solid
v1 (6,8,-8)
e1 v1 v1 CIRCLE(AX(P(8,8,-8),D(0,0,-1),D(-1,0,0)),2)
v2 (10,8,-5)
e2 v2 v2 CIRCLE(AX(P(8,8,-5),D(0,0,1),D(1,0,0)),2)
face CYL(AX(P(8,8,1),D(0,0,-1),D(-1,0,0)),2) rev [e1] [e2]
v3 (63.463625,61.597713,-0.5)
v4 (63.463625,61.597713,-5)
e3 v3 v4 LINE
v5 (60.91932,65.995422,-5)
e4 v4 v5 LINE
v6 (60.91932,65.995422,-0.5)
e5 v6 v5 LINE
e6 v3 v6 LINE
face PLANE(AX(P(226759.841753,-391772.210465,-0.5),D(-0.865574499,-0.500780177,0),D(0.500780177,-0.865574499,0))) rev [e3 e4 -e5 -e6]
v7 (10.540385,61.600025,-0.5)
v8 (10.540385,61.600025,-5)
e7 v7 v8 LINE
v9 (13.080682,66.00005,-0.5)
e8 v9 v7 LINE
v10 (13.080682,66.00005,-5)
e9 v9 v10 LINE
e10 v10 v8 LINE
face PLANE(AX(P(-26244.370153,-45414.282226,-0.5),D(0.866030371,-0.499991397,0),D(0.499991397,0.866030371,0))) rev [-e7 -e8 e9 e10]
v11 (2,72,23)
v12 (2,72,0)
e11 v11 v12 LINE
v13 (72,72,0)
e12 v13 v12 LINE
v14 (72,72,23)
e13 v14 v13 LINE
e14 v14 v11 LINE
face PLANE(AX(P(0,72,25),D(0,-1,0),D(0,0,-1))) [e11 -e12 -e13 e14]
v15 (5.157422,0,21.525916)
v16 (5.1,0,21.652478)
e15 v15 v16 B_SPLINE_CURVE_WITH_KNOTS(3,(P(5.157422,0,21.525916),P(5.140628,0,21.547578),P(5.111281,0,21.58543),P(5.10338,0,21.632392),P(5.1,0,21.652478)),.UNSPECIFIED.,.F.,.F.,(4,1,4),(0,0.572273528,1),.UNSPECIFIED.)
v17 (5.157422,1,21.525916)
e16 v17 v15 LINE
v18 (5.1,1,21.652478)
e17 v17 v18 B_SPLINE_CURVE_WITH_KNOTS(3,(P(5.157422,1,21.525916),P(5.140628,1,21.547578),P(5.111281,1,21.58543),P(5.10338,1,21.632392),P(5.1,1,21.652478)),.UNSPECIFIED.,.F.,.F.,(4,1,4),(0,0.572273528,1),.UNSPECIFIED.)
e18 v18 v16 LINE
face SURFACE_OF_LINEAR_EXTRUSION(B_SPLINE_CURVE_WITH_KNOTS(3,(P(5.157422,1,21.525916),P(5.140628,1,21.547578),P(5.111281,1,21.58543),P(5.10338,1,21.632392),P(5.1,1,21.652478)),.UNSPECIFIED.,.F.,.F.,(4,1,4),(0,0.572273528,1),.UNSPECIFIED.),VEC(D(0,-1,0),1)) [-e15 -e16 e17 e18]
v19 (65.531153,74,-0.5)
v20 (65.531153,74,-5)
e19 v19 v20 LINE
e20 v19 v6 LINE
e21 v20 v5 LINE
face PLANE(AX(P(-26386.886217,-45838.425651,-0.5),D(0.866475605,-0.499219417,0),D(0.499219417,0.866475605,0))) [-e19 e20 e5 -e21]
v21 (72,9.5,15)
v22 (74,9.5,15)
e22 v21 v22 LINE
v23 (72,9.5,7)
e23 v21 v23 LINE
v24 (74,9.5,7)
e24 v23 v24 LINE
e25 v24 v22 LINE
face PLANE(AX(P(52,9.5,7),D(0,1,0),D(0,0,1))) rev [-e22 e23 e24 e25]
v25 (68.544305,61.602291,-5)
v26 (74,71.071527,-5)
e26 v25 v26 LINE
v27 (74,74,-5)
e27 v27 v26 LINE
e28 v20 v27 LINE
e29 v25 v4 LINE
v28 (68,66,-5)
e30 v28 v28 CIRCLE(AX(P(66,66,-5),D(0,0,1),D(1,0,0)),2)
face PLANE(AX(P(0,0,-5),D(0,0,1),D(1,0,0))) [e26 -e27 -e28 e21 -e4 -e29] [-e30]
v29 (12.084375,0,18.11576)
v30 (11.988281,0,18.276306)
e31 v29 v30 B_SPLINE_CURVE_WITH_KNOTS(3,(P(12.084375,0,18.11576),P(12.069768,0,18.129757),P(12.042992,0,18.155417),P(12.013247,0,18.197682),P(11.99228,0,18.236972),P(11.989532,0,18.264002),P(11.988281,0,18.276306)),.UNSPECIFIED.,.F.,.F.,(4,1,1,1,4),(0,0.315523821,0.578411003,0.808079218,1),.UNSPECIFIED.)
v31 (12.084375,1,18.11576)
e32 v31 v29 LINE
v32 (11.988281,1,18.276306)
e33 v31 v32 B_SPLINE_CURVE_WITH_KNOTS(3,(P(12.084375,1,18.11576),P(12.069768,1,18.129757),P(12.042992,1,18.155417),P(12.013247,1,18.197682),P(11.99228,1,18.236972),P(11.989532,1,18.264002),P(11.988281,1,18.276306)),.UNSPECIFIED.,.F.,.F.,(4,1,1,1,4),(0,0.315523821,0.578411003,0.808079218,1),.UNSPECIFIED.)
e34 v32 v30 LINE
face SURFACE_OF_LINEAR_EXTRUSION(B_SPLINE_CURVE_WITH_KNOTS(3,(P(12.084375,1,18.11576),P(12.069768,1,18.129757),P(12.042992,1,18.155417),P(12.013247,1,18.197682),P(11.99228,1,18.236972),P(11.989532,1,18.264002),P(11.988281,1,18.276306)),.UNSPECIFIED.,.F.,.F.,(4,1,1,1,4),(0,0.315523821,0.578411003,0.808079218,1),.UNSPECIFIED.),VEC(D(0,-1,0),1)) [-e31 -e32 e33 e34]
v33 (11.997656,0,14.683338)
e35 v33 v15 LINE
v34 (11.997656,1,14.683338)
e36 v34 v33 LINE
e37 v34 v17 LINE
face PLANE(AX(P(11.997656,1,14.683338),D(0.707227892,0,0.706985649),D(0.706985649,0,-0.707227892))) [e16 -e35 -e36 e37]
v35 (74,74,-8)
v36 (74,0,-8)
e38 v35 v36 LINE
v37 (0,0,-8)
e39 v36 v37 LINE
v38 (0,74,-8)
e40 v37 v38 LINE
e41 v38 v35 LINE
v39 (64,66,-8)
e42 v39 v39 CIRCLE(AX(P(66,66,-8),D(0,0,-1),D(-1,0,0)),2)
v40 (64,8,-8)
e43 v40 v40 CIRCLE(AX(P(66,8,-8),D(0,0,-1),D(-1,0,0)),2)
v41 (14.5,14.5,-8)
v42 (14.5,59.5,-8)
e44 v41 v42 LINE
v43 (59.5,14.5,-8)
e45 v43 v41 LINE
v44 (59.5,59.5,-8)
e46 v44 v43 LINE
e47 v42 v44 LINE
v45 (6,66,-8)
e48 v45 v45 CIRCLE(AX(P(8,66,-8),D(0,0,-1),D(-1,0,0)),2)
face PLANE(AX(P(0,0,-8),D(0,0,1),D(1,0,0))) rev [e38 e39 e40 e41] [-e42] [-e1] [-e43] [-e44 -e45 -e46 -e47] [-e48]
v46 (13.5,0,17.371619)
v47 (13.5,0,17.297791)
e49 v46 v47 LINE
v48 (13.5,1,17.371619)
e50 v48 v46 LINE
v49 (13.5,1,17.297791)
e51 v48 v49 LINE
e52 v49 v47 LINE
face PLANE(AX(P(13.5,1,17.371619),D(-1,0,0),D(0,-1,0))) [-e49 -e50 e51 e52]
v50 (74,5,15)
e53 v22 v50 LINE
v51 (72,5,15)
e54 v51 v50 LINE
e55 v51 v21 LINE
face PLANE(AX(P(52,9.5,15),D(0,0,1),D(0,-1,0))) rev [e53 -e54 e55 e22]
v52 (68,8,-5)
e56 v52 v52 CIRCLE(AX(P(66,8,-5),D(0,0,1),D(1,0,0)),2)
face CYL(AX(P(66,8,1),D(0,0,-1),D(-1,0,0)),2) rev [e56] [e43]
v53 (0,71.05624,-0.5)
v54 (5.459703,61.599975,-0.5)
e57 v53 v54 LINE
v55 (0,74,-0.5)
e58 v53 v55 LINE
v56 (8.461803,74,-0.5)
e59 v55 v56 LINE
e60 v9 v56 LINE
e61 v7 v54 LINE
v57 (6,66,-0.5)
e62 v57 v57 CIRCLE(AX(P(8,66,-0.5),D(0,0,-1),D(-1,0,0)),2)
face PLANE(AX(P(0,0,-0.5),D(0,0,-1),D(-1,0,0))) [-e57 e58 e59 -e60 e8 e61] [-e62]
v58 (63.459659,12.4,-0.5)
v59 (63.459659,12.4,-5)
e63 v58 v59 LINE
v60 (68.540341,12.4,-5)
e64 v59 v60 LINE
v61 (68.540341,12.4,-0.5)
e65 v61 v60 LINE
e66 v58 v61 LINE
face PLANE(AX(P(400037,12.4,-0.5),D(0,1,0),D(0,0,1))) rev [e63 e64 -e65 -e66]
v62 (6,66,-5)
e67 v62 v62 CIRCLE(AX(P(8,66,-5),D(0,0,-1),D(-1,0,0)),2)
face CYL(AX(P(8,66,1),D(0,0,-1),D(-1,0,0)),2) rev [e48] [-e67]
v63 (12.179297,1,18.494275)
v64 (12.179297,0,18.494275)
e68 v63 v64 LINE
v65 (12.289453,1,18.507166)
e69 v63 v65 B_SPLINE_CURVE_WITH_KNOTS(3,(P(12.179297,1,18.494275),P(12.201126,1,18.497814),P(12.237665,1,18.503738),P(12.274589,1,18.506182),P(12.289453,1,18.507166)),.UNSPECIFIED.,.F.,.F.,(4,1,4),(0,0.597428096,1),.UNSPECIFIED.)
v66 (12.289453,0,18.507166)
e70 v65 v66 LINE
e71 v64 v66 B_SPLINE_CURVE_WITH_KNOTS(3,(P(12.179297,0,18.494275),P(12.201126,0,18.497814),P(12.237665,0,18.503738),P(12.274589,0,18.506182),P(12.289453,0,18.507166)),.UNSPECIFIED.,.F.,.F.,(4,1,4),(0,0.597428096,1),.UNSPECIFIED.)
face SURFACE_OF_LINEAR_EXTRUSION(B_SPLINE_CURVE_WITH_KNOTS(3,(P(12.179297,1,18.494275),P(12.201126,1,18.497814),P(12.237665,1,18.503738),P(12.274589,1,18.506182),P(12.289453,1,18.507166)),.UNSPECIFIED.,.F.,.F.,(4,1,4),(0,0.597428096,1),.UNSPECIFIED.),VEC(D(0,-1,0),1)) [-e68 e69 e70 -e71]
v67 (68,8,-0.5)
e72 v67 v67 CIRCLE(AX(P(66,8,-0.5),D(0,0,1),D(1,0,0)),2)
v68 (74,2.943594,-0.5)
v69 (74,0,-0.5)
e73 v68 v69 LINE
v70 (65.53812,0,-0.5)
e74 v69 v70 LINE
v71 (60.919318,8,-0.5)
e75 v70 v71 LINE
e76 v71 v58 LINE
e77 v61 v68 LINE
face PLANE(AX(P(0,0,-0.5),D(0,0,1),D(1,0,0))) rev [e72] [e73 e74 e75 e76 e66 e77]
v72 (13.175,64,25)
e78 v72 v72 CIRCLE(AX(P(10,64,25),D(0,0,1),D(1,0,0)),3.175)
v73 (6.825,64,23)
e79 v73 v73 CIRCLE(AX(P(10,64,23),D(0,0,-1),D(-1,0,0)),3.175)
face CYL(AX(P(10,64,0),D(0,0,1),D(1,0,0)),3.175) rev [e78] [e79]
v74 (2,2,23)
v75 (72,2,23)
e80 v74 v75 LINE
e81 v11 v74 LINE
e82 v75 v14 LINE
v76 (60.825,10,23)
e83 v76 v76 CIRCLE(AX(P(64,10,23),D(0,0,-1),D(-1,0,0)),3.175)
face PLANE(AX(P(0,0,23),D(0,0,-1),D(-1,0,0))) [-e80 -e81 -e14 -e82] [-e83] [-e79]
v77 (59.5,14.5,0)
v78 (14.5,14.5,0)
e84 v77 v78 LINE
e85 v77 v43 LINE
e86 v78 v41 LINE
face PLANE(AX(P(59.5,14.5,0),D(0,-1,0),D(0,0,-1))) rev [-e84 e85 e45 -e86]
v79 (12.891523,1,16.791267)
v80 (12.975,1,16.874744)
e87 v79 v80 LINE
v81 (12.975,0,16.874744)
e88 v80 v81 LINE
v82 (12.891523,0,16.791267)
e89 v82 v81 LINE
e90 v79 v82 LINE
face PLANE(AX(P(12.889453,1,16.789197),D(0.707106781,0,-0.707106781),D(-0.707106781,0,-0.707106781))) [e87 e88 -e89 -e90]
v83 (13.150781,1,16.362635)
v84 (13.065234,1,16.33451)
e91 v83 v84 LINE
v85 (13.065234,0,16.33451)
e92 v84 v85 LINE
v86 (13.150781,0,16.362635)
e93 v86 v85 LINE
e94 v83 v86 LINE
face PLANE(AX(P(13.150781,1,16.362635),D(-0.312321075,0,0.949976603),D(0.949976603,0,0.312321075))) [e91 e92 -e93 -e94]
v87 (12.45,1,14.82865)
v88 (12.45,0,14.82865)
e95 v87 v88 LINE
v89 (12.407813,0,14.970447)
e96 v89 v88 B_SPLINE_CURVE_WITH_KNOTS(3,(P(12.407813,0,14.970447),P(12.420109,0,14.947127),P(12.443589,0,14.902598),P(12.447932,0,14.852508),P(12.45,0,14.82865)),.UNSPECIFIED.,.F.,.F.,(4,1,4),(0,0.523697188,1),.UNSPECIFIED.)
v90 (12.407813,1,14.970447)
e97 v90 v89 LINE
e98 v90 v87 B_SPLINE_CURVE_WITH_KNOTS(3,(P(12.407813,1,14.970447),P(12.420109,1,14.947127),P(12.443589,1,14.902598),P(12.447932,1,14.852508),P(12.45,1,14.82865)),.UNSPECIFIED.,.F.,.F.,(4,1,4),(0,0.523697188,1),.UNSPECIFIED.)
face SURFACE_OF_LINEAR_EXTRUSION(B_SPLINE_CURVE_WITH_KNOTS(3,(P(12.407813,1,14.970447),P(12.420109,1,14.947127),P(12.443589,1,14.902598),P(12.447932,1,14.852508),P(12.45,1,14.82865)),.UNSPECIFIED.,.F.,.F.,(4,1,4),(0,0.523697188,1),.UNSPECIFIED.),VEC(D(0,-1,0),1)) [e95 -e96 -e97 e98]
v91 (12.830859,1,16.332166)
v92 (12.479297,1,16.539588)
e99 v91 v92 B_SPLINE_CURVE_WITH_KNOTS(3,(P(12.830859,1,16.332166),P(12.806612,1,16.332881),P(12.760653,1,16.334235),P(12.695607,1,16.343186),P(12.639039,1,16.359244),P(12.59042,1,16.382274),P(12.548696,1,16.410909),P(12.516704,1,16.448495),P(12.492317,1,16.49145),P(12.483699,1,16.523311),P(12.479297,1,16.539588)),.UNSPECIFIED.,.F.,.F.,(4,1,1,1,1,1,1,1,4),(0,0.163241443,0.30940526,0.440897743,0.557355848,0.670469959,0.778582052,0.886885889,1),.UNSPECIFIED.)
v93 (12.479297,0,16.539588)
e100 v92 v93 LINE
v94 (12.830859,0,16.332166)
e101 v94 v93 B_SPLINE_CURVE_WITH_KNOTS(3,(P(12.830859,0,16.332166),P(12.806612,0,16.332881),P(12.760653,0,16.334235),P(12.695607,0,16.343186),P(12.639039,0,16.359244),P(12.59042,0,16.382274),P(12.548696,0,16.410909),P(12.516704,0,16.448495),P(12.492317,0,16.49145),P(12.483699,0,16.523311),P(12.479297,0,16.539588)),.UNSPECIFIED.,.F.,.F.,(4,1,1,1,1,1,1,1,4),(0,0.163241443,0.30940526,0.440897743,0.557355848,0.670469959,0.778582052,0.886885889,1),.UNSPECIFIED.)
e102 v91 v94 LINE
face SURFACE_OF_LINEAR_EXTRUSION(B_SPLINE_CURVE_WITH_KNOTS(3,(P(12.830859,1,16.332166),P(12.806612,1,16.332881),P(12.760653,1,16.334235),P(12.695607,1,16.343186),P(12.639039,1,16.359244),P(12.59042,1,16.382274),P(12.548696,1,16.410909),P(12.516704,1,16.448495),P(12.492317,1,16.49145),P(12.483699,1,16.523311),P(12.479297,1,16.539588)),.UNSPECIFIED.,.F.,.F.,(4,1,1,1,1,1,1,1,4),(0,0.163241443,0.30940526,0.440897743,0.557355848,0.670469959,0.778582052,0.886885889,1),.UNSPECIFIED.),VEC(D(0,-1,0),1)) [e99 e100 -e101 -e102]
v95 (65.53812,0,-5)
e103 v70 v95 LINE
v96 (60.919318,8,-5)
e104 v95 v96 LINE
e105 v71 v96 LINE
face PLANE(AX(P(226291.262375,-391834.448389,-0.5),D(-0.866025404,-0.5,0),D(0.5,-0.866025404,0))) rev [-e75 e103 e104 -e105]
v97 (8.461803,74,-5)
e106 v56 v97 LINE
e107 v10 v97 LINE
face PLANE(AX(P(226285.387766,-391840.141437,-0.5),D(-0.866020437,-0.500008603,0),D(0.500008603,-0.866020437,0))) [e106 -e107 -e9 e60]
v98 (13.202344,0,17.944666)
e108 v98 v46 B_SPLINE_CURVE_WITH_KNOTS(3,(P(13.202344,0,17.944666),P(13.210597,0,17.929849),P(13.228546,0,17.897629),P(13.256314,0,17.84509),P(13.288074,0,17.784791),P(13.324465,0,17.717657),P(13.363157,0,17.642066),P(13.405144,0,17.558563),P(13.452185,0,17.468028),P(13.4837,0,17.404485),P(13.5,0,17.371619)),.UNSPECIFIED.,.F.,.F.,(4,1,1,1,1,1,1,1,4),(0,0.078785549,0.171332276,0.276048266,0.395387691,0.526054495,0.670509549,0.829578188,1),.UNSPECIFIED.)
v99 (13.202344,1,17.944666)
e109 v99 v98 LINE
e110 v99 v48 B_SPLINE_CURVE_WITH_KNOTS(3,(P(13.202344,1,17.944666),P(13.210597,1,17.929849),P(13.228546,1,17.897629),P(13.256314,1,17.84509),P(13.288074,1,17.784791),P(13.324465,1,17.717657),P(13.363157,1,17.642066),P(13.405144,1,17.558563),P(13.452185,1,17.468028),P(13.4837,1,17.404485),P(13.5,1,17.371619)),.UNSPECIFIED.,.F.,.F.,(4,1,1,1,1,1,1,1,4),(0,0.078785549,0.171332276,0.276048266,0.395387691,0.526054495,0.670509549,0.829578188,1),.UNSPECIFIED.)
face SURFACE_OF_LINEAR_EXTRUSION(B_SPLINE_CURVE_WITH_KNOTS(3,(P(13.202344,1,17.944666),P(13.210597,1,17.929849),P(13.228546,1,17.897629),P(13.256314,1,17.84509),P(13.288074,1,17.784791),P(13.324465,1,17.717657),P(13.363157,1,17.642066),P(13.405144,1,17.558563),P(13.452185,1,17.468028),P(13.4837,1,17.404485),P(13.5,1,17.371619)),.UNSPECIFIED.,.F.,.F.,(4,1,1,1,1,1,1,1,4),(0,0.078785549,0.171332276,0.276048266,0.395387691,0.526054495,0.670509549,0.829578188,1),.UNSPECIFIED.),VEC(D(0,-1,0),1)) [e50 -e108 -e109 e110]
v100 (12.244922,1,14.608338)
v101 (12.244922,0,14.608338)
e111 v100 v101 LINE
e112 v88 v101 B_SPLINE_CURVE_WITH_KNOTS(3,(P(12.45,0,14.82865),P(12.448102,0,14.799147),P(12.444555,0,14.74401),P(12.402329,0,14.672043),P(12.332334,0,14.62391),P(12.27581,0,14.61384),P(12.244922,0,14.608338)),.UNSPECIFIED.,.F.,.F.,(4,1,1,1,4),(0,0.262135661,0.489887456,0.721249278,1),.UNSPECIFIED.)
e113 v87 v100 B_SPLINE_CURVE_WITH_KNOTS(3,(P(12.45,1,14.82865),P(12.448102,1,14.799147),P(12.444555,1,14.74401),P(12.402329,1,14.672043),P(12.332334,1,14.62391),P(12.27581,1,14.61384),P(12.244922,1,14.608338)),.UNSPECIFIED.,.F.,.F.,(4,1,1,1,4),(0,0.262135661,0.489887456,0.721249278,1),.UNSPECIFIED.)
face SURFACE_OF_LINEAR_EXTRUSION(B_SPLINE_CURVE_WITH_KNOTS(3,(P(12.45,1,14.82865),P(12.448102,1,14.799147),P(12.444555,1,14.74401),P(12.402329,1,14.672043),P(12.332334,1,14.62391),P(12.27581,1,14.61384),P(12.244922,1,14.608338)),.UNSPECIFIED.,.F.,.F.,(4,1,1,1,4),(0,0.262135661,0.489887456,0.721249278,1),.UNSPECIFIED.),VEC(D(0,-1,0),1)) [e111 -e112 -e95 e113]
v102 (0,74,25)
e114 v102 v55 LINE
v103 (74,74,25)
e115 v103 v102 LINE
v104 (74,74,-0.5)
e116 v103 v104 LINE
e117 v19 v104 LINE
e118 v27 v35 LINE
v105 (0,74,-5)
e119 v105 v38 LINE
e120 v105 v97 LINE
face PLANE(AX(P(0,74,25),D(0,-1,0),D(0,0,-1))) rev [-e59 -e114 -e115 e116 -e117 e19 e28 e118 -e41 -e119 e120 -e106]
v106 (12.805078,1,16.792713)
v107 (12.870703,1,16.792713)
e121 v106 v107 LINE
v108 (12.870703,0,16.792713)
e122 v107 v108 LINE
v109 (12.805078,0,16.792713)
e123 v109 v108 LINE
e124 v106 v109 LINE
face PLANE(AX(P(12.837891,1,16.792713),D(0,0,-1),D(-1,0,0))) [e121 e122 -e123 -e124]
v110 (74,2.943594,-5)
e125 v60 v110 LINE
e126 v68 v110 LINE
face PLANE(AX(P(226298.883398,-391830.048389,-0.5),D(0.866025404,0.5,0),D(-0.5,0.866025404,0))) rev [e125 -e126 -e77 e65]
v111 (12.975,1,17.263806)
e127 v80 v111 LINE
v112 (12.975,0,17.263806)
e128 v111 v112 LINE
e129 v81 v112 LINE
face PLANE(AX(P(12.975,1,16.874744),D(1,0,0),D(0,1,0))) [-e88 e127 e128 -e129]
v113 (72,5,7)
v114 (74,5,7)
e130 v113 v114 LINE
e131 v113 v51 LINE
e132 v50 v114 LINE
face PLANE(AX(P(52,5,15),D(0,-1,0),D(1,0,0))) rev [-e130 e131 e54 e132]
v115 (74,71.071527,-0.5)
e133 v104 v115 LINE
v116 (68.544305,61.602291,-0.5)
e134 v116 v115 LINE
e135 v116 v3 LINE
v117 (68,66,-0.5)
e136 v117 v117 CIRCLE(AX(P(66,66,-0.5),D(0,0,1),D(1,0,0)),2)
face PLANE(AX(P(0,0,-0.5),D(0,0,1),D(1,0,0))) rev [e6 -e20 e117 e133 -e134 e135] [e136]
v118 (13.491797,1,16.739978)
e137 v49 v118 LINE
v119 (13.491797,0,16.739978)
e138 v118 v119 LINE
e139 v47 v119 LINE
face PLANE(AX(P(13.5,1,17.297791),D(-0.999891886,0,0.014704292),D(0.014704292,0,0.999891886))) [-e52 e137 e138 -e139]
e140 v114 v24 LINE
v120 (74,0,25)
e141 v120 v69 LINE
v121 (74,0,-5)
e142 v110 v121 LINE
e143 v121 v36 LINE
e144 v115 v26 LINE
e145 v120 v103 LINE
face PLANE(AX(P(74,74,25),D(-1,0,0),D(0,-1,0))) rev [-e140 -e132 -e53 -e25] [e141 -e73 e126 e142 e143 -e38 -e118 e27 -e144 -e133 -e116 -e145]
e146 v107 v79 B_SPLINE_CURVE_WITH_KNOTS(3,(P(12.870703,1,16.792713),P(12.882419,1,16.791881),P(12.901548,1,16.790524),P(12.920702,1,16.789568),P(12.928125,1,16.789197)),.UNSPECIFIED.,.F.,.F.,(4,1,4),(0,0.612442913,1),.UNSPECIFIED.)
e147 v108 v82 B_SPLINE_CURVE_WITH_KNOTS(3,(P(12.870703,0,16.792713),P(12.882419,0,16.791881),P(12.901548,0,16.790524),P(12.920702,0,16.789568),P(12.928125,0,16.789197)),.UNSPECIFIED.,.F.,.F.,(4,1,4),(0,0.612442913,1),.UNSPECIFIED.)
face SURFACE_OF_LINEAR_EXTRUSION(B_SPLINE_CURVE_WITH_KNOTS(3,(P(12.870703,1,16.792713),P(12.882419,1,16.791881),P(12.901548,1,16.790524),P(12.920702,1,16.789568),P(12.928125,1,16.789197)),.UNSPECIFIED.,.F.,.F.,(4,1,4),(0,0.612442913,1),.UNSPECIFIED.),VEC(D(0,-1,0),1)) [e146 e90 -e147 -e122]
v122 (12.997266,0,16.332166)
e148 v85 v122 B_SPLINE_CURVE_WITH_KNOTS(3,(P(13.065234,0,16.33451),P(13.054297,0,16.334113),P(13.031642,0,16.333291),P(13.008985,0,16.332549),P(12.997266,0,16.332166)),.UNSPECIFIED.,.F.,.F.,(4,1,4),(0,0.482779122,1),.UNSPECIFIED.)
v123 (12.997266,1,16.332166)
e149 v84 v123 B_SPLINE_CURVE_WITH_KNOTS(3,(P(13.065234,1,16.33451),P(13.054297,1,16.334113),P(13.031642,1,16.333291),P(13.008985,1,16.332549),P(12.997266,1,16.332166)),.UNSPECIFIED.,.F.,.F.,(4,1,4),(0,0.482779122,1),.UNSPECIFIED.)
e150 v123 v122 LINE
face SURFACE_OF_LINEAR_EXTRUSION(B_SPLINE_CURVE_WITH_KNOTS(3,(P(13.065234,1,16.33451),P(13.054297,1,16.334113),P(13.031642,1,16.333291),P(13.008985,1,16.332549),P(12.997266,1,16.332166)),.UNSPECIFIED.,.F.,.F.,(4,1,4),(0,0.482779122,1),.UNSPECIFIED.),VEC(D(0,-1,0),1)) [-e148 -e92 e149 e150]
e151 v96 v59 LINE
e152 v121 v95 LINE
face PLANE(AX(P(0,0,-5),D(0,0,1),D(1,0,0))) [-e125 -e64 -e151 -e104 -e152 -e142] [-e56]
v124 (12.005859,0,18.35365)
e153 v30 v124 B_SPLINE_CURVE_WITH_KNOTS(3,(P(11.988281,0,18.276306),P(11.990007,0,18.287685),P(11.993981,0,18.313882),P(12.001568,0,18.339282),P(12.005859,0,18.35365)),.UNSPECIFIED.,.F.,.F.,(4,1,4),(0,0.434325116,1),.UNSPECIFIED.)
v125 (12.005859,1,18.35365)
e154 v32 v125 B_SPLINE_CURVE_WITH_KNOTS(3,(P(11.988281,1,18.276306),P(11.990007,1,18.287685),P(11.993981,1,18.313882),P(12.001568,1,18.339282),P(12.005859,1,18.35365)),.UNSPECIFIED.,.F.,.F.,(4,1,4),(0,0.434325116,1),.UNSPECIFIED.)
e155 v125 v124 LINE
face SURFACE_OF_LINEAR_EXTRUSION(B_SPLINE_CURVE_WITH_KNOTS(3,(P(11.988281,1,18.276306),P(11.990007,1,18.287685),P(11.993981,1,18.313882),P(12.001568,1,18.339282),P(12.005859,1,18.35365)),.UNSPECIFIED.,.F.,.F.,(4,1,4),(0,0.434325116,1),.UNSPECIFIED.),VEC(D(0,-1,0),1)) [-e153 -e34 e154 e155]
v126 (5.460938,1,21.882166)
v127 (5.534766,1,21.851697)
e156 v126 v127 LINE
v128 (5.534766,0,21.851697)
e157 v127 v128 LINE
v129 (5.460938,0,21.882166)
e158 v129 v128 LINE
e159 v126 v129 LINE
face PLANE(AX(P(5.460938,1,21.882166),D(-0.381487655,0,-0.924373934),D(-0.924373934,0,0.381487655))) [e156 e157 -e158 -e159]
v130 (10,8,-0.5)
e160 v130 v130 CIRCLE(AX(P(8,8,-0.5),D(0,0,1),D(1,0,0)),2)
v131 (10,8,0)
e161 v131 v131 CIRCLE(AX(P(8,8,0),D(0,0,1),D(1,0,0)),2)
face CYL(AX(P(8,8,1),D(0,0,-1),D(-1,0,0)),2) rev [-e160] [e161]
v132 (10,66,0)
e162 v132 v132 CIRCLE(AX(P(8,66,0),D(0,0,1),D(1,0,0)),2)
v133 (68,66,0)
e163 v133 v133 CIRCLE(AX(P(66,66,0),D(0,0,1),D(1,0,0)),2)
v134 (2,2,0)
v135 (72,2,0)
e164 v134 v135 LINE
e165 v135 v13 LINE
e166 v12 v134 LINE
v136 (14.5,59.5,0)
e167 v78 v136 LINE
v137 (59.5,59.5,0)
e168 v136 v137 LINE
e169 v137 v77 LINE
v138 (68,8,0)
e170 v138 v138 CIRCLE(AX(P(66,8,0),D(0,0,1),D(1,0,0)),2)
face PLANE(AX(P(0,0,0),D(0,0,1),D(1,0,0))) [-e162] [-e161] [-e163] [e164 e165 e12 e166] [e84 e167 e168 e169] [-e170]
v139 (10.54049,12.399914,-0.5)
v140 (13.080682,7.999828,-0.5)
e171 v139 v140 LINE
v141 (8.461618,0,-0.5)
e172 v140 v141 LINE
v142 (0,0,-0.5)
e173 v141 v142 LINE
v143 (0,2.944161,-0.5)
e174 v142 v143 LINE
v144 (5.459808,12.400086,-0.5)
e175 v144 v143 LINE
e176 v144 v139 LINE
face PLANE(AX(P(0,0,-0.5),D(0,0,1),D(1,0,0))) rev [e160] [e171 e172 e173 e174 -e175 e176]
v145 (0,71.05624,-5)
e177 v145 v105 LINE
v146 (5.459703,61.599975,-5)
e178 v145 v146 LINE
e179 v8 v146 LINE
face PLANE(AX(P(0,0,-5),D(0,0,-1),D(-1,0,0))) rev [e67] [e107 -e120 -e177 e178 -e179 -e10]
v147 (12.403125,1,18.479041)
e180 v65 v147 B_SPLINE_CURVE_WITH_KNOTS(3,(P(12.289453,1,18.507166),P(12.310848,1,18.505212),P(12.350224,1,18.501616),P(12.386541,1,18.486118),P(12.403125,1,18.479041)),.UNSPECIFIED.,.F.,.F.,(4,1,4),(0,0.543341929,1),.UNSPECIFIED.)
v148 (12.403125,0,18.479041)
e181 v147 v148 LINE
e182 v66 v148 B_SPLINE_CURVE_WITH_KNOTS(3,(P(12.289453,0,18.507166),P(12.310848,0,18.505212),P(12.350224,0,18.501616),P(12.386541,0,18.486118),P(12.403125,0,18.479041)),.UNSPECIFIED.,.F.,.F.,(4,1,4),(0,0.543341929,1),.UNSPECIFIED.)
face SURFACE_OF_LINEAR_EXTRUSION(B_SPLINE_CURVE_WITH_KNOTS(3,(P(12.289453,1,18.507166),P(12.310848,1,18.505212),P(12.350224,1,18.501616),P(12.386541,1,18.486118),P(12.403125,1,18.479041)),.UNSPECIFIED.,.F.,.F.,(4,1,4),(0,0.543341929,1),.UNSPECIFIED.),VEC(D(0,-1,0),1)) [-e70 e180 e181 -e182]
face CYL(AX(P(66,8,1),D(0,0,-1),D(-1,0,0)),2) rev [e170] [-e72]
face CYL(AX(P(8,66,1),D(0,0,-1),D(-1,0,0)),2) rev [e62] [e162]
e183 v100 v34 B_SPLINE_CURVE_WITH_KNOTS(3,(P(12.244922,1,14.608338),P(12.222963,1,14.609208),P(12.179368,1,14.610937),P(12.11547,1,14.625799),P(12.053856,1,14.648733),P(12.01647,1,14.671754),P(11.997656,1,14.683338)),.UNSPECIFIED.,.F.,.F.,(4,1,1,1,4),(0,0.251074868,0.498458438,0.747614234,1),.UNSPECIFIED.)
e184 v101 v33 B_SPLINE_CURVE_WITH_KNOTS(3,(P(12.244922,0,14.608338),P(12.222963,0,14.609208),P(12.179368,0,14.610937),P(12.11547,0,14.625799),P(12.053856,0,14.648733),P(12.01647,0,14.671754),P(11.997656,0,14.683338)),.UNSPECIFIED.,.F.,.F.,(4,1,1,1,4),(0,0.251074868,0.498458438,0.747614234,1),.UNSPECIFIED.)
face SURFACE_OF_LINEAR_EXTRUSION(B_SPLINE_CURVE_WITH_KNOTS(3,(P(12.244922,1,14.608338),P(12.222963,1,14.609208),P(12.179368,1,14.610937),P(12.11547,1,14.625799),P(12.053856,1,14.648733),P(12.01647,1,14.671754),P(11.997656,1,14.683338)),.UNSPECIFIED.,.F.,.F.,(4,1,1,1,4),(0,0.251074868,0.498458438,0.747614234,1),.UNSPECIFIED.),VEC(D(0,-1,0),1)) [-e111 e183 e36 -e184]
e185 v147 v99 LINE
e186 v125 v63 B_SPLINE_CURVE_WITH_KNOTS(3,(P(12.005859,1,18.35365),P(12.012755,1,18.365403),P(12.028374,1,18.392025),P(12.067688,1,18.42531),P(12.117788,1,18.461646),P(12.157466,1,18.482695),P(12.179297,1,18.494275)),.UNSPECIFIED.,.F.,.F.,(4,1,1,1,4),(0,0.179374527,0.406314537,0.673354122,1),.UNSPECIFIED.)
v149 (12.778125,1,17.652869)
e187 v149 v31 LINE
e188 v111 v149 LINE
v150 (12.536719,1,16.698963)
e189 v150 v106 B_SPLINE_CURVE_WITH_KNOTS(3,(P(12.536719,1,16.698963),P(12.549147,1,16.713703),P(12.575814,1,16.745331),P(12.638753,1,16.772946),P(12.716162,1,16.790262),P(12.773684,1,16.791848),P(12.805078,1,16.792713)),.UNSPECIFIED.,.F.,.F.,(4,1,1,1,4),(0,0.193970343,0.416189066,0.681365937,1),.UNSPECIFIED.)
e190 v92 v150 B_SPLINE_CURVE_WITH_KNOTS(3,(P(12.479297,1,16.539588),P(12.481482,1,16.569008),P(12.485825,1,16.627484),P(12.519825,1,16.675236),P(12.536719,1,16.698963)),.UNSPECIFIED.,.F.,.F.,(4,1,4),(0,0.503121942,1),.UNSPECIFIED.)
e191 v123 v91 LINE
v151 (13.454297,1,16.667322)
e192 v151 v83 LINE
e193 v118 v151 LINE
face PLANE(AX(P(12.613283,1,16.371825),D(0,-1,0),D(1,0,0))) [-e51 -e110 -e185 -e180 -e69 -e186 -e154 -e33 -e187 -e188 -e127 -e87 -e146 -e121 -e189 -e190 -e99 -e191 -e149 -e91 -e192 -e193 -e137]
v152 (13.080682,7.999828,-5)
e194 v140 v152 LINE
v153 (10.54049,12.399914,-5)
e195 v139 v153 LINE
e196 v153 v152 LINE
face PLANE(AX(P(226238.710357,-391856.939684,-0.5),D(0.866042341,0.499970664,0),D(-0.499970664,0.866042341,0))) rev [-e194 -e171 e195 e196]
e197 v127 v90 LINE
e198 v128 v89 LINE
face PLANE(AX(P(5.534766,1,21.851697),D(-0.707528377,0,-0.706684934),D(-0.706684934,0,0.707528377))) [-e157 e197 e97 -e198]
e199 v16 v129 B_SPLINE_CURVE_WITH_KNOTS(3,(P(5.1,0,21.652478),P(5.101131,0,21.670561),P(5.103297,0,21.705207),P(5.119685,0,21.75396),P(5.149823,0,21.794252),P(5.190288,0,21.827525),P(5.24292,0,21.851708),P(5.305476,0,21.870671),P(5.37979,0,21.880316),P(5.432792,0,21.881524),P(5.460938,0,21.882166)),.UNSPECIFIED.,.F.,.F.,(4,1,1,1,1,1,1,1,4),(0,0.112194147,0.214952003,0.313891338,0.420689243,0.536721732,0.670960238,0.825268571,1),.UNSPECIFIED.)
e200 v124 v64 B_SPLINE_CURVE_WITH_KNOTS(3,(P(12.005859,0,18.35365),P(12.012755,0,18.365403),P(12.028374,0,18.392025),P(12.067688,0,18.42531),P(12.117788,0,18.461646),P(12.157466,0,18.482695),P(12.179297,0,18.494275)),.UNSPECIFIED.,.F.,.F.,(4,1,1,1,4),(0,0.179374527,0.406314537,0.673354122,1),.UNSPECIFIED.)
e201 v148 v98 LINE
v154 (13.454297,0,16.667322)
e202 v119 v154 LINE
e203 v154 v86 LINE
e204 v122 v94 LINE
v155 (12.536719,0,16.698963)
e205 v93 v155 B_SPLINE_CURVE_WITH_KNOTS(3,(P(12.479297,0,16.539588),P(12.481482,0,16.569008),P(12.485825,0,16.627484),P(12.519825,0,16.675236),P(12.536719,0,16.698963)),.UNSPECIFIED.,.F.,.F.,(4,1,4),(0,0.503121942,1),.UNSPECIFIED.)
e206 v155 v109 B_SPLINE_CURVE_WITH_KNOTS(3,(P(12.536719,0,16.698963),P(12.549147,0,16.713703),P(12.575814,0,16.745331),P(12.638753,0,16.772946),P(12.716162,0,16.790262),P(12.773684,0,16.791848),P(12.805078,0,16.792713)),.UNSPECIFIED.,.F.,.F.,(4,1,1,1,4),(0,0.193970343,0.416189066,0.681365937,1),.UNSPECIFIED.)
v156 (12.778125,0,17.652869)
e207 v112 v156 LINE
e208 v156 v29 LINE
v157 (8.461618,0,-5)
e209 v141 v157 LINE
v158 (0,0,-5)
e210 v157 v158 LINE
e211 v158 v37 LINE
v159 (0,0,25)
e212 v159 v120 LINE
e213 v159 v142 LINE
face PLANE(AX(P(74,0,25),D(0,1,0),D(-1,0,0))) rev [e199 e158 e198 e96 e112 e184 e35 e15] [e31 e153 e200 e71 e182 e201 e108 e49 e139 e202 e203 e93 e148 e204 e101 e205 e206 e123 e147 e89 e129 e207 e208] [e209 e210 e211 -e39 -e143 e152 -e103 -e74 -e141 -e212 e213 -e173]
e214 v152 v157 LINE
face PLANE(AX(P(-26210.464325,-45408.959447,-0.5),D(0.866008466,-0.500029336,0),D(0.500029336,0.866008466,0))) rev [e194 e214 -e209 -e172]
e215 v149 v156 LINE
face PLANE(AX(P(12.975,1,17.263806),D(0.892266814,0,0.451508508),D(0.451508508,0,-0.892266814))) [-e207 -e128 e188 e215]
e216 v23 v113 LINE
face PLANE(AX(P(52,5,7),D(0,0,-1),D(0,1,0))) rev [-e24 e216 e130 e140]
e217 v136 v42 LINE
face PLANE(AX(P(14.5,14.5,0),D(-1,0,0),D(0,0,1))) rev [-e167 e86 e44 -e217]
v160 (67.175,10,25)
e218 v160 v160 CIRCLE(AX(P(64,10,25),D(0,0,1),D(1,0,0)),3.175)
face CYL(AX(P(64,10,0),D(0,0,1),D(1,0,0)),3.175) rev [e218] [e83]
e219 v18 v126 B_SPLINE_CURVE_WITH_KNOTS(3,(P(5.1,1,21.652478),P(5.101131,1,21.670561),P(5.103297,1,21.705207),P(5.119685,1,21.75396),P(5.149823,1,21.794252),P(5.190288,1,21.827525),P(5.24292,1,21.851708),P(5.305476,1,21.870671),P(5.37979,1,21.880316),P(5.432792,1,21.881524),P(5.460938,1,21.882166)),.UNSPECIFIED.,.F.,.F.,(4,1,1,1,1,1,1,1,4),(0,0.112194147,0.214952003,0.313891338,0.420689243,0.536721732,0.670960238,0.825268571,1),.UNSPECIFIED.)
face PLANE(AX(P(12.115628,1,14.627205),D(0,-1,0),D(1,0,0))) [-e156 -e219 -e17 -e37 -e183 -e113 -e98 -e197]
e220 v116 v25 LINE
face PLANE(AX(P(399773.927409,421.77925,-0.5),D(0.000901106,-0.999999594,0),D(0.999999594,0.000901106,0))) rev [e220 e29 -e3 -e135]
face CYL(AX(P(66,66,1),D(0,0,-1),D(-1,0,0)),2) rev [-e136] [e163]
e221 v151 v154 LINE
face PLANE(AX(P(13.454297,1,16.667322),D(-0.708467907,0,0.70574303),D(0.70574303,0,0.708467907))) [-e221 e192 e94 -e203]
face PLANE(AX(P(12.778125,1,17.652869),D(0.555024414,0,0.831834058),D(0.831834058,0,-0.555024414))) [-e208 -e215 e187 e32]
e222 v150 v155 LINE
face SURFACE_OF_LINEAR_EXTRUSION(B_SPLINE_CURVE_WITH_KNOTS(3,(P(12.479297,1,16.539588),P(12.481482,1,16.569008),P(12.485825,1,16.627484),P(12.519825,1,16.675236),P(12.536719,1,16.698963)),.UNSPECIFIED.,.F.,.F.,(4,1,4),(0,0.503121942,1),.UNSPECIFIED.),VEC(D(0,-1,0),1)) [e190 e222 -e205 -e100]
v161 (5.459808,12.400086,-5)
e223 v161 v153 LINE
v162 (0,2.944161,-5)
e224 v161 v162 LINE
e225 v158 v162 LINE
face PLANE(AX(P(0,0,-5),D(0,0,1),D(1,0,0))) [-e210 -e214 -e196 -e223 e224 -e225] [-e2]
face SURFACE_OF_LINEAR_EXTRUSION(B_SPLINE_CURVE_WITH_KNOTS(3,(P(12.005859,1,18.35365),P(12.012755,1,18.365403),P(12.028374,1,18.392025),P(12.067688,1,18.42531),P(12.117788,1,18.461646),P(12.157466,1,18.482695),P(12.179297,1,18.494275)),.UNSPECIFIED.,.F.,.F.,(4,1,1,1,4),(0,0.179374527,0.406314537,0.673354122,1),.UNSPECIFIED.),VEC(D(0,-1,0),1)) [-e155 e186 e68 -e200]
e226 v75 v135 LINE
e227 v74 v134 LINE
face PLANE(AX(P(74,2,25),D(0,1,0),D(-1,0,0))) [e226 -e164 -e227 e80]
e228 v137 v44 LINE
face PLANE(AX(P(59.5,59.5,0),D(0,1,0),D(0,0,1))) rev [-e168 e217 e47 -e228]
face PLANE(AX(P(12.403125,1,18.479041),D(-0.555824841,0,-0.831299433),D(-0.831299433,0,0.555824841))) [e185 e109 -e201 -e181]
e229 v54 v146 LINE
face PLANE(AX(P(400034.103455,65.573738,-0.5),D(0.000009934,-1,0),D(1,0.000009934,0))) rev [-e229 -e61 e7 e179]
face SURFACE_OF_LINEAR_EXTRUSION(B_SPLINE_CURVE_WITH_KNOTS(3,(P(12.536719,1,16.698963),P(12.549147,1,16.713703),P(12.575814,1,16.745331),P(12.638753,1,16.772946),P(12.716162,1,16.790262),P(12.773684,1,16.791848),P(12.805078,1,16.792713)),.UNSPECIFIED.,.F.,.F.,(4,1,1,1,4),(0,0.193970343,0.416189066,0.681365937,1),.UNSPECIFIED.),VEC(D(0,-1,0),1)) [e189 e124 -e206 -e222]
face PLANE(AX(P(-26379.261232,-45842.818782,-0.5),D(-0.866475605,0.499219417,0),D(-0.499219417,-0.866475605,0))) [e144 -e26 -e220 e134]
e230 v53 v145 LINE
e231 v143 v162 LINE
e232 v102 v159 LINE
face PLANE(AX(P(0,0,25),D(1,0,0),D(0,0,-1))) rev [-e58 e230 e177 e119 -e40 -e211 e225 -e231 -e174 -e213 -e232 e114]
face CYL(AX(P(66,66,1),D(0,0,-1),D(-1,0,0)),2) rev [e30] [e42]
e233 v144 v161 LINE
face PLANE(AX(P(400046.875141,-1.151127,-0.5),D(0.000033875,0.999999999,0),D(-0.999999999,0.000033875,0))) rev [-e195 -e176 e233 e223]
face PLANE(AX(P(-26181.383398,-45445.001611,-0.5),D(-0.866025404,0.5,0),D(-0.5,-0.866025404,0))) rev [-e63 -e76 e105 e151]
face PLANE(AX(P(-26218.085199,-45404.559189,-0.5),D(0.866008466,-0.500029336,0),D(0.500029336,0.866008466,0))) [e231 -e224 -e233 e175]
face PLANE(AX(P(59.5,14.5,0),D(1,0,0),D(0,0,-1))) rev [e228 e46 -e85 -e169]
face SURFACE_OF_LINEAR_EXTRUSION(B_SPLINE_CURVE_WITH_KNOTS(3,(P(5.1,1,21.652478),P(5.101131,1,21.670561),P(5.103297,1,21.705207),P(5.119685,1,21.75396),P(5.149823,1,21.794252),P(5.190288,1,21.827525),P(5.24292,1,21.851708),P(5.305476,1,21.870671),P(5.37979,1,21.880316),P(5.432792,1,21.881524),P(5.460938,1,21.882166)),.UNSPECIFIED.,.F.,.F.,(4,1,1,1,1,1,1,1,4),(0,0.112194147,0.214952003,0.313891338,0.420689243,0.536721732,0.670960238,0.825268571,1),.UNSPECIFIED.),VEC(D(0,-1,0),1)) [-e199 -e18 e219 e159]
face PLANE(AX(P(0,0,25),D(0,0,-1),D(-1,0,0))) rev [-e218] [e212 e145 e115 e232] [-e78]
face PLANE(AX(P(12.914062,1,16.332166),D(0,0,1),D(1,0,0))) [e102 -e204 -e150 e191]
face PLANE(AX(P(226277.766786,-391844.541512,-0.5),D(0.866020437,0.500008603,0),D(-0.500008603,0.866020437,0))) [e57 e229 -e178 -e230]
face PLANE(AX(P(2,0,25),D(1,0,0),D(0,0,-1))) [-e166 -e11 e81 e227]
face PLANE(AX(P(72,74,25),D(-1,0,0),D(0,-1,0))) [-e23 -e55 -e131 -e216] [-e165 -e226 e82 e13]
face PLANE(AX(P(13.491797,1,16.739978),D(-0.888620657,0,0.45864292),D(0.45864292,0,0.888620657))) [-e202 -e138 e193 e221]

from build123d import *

# Parameters (mm, degrees)
SKETCH1_W           = 74
SKETCH1_H           = 74
BOSS_EXTRUDE1_DEPTH = 25
SHELL1_T            = -2
SKETCH2_W           = 8
SKETCH2_H           = 4.5
CUT_EXTRUDE1_DEPTH  = 22
SKETCH3_R           = 3.175
CUT_EXTRUDE2_DEPTH  = 108.596468344
SKETCH4_W           = 74
SKETCH4_H           = 74
BOSS_EXTRUDE2_DEPTH = 8
CUT_EXTRUDE3_START  = -3
CUT_EXTRUDE3_DEPTH  = 4.5
SKETCH6_W           = 45
SKETCH6_H           = 45
CUT_EXTRUDE4_DEPTH  = 8
CUT_EXTRUDE10_START = -1
CUT_EXTRUDE10_DEPTH = 1
SKETCH5_4_R         = 2
CUT_EXTRUDE11_DEPTH = 9


# Read off the part's stored shape, not the designer's step: Cut-Extrude10
with BuildPart() as part:
    # Sketch1 → Boss-Extrude1 (new body)
    with BuildSketch(Plane.XY):
        with Locations((37, 37)):
            Rectangle(SKETCH1_W, SKETCH1_H)
    extrude(amount=BOSS_EXTRUDE1_DEPTH)

    # Shell1
    shell1_openings = [part.faces().sort_by_distance(p)[0] for p in [
        (37, 37, 0),
    ]]
    offset(amount=SHELL1_T, openings=shell1_openings, kind=Kind.INTERSECTION)

    # Sketch2 → Cut-Extrude1 (cut)
    with BuildSketch(Plane(origin=(74, 0, 0), x_dir=(0, 0, -1), z_dir=(1, 0, 0))):
        with Locations((-11, 7.25)):
            Rectangle(SKETCH2_W, SKETCH2_H)
    extrude(amount=-CUT_EXTRUDE1_DEPTH, mode=Mode.SUBTRACT)

    # Sketch3 → Cut-Extrude2 (cut, through all)
    with BuildSketch(Plane.XY.offset(25)):
        with Locations((10, 64)):
            Circle(SKETCH3_R)
        with Locations((64, 10)):
            Circle(SKETCH3_R)
    extrude(amount=-CUT_EXTRUDE2_DEPTH, mode=Mode.SUBTRACT)

    # Sketch4 → Boss-Extrude2 (add)
    with BuildSketch(Plane(origin=(0, 0, 0), x_dir=(-1, 0, 0), z_dir=(0, 0, -1))):
        with Locations((-37, 37)):
            Rectangle(SKETCH4_W, SKETCH4_H)
    extrude(amount=BOSS_EXTRUDE2_DEPTH)

    # Sketch5 → Cut-Extrude3 (cut)
    with BuildSketch(Plane(origin=(0, 0, -8), x_dir=(-1, 0, 0), z_dir=(0, 0, -1)).offset(CUT_EXTRUDE3_START)):
        Polygon((-60.919317631, 8), (-63.459658816, 12.4), (-68.540341184, 12.4), (-74.568746864, 1.958495074), (-74.568746864, -0.972282173), (-66.099467159, -0.972282173), align=None)
        Polygon((-63.463624712, 61.59771267), (-60.919319694, 65.995421768), (-65.802792889, 74.471475085), (-74.465371111, 74.471475085), (-74.465371111, 71.879253606), (-68.544305018, 61.602290902), align=None)
        Polygon((-5.459702524, 61.599974765), (0.703595557, 72.274875291), (0.703595557, 74.471475085), (-8.189590882, 74.471475085), (-13.080682369, 66.00005047), (-10.540384893, 61.600025235), align=None)
        Polygon((-10.540490231, 12.399913945), (-13.080682366, 7.999827894), (-7.995582963, -0.807133653), (0.571776258, -0.807133653), (0.571776258, 1.953893119), (-5.459807865, 12.40008605), align=None)
    extrude(amount=-CUT_EXTRUDE3_DEPTH, mode=Mode.SUBTRACT)

    # Sketch6 → Cut-Extrude4 (cut)
    with BuildSketch(Plane(origin=(0, 0, -8), x_dir=(-1, 0, 0), z_dir=(0, 0, -1))):
        with Locations((-37, 37)):
            Rectangle(SKETCH6_W, SKETCH6_H)
    extrude(amount=-CUT_EXTRUDE4_DEPTH, mode=Mode.SUBTRACT)

    # Cut-Extrude10 outline → Cut-Extrude10 (cut)
    with BuildSketch(Plane.XZ.offset(CUT_EXTRUDE10_START)):
        with BuildLine():
            add(Edge.make_bspline(
                [(12.244921875, 14.608337696), (12.22296299, 14.60920838), (12.179368061, 14.610936947), (12.115469745, 14.625798621), (12.053855992, 14.648733433), (12.016469754, 14.671753524), (11.99765625, 14.683337696)],
                knots=[0, 0, 0, 0, 0.251074868, 0.498458438, 0.747614234, 1, 1, 1, 1], degree=3))
            add(Edge.make_bspline(
                [(12.45, 14.828650196), (12.44810186, 14.799147003), (12.444554554, 14.744010497), (12.402329284, 14.672042766), (12.332334145, 14.623910287), (12.275809653, 14.613840387), (12.244921875, 14.608337696)],
                knots=[0, 0, 0, 0, 0.262135661, 0.489887456, 0.721249278, 1, 1, 1, 1], degree=3))
            add(Edge.make_bspline(
                [(12.4078125, 14.970447071), (12.420108898, 14.947127329), (12.443588874, 14.902598273), (12.447931564, 14.852508226), (12.45, 14.828650196)],
                knots=[0, 0, 0, 0, 0.523697188, 1, 1, 1, 1], degree=3))
            Line((12.4078125, 14.970447071), (5.534765625, 21.851697071))
            Line((5.534765625, 21.851697071), (5.4609375, 21.882165821))
            add(Edge.make_bspline(
                [(5.1, 21.652478321), (5.101130742, 21.670561394), (5.103297124, 21.705206632), (5.119685049, 21.75396019), (5.149823147, 21.794252088), (5.190287736, 21.827525127), (5.242920358, 21.851708451), (5.305475941, 21.870670729), (5.379789996, 21.880316446), (5.432791747, 21.881524371), (5.4609375, 21.882165821)],
                knots=[0, 0, 0, 0, 0.112194147, 0.214952003, 0.313891338, 0.420689243, 0.536721732, 0.670960238, 0.825268571, 1, 1, 1, 1], degree=3))
            add(Edge.make_bspline(
                [(5.157421875, 21.525915821), (5.140627717, 21.547577619), (5.111281334, 21.585429794), (5.103379727, 21.632391539), (5.1, 21.652478321)],
                knots=[0, 0, 0, 0, 0.572273528, 1, 1, 1, 1], degree=3))
            Line((5.157421875, 21.525915821), (11.99765625, 14.683337696))
        make_face()
        with BuildLine():
            add(Edge.make_bspline(
                [(12.830859375, 16.332165821), (12.806611722, 16.332880637), (12.760653103, 16.334235487), (12.695606656, 16.343185504), (12.639038997, 16.359243561), (12.590419576, 16.382273546), (12.548696495, 16.410908541), (12.516703569, 16.448495353), (12.492316543, 16.491450489), (12.483699168, 16.523311237), (12.479296875, 16.539587696)],
                knots=[0, 0, 0, 0, 0.163241443, 0.30940526, 0.440897743, 0.557355848, 0.670469959, 0.778582052, 0.886885889, 1, 1, 1, 1], degree=3))
            Line((12.830859375, 16.332165821), (12.997265625, 16.332165821))
            add(Edge.make_bspline(
                [(13.065234375, 16.334509571), (13.054297092, 16.334112667), (13.031642253, 16.333290544), (13.008984624, 16.332549239), (12.997265625, 16.332165821)],
                knots=[0, 0, 0, 0, 0.482779122, 1, 1, 1, 1], degree=3))
            Line((13.065234375, 16.334509571), (13.15078125, 16.362634571))
            Line((13.15078125, 16.362634571), (13.454296875, 16.667322071))
            Line((13.454296875, 16.667322071), (13.491796875, 16.739978321))
            Line((13.491796875, 16.739978321), (13.5, 17.297790821))
            Line((13.5, 17.297790821), (13.5, 17.371618946))
            add(Edge.make_bspline(
                [(13.20234375, 17.944665821), (13.210597157, 17.929849426), (13.228545564, 17.897628712), (13.256314404, 17.845089826), (13.288074333, 17.78479063), (13.324465456, 17.717657372), (13.363157298, 17.642066218), (13.405143778, 17.558563248), (13.452185232, 17.468028061), (13.483699781, 17.404485145), (13.5, 17.371618946)],
                knots=[0, 0, 0, 0, 0.078785549, 0.171332276, 0.276048266, 0.395387691, 0.526054495, 0.670509549, 0.829578188, 1, 1, 1, 1], degree=3))
            Line((13.20234375, 17.944665821), (12.403125, 18.479040821))
            add(Edge.make_bspline(
                [(12.289453125, 18.507165821), (12.31084801, 18.5052121), (12.350224476, 18.501616352), (12.386540839, 18.486118184), (12.403125, 18.479040821)],
                knots=[0, 0, 0, 0, 0.543341929, 1, 1, 1, 1], degree=3))
            add(Edge.make_bspline(
                [(12.179296875, 18.494275196), (12.201126009, 18.497814185), (12.237664521, 18.503737892), (12.274588549, 18.506181923), (12.289453125, 18.507165821)],
                knots=[0, 0, 0, 0, 0.597428096, 1, 1, 1, 1], degree=3))
            add(Edge.make_bspline(
                [(12.005859375, 18.353650196), (12.012754805, 18.365403015), (12.028374155, 18.392025197), (12.067688375, 18.425310284), (12.117788217, 18.461646386), (12.157466096, 18.482694512), (12.179296875, 18.494275196)],
                knots=[0, 0, 0, 0, 0.179374527, 0.406314537, 0.673354122, 1, 1, 1, 1], degree=3))
            add(Edge.make_bspline(
                [(11.98828125, 18.276306446), (11.990007203, 18.287684739), (11.993981075, 18.31388238), (12.001567772, 18.339282172), (12.005859375, 18.353650196)],
                knots=[0, 0, 0, 0, 0.434325116, 1, 1, 1, 1], degree=3))
            add(Edge.make_bspline(
                [(12.084375, 18.115759571), (12.069768434, 18.129757216), (12.042992013, 18.155417378), (12.013246552, 18.197681646), (11.992279819, 18.236971695), (11.9895321, 18.264001579), (11.98828125, 18.276306446)],
                knots=[0, 0, 0, 0, 0.315523821, 0.578411003, 0.808079218, 1, 1, 1, 1], degree=3))
            Line((12.084375, 18.115759571), (12.778125, 17.652868946))
            Line((12.778125, 17.652868946), (12.975, 17.263806446))
            Line((12.975, 17.263806446), (12.975, 16.874743946))
            Line((12.975, 16.874743946), (12.891522636, 16.791266582))
            add(Edge.make_bspline(
                [(12.870703125, 16.792712696), (12.87764234, 16.792220225), (12.884581555, 16.791727755), (12.891522636, 16.791266582)],
                knots=[0, 0, 0, 0, 0.362748525, 0.362748525, 0.362748525, 0.362748525], degree=3))
            Line((12.870703125, 16.792712696), (12.805078125, 16.792712696))
            add(Edge.make_bspline(
                [(12.53671875, 16.698962696), (12.549147315, 16.713703314), (12.575814448, 16.745331261), (12.638752816, 16.772945663), (12.716162101, 16.790262491), (12.773683775, 16.791847581), (12.805078125, 16.792712696)],
                knots=[0, 0, 0, 0, 0.193970343, 0.416189066, 0.681365937, 1, 1, 1, 1], degree=3))
            add(Edge.make_bspline(
                [(12.479296875, 16.539587696), (12.481482036, 16.569008186), (12.48582524, 16.627484051), (12.51982501, 16.675235867), (12.53671875, 16.698962696)],
                knots=[0, 0, 0, 0, 0.503121942, 1, 1, 1, 1], degree=3))
        make_face()
    extrude(amount=CUT_EXTRUDE10_DEPTH, mode=Mode.SUBTRACT)

    # Sketch5<4> → Cut-Extrude11 (cut)
    with BuildSketch(Plane(origin=(0, 0, -8), x_dir=(-1, 0, 0), z_dir=(0, 0, -1))):
        with Locations((-66, 66)):
            Circle(SKETCH5_4_R)
        with Locations((-8, 66)):
            Circle(SKETCH5_4_R)
        with Locations((-8, 8)):
            Circle(SKETCH5_4_R)
        with Locations((-66, 8)):
            Circle(SKETCH5_4_R)
    extrude(amount=-CUT_EXTRUDE11_DEPTH, mode=Mode.SUBTRACT)


solid = part.part
